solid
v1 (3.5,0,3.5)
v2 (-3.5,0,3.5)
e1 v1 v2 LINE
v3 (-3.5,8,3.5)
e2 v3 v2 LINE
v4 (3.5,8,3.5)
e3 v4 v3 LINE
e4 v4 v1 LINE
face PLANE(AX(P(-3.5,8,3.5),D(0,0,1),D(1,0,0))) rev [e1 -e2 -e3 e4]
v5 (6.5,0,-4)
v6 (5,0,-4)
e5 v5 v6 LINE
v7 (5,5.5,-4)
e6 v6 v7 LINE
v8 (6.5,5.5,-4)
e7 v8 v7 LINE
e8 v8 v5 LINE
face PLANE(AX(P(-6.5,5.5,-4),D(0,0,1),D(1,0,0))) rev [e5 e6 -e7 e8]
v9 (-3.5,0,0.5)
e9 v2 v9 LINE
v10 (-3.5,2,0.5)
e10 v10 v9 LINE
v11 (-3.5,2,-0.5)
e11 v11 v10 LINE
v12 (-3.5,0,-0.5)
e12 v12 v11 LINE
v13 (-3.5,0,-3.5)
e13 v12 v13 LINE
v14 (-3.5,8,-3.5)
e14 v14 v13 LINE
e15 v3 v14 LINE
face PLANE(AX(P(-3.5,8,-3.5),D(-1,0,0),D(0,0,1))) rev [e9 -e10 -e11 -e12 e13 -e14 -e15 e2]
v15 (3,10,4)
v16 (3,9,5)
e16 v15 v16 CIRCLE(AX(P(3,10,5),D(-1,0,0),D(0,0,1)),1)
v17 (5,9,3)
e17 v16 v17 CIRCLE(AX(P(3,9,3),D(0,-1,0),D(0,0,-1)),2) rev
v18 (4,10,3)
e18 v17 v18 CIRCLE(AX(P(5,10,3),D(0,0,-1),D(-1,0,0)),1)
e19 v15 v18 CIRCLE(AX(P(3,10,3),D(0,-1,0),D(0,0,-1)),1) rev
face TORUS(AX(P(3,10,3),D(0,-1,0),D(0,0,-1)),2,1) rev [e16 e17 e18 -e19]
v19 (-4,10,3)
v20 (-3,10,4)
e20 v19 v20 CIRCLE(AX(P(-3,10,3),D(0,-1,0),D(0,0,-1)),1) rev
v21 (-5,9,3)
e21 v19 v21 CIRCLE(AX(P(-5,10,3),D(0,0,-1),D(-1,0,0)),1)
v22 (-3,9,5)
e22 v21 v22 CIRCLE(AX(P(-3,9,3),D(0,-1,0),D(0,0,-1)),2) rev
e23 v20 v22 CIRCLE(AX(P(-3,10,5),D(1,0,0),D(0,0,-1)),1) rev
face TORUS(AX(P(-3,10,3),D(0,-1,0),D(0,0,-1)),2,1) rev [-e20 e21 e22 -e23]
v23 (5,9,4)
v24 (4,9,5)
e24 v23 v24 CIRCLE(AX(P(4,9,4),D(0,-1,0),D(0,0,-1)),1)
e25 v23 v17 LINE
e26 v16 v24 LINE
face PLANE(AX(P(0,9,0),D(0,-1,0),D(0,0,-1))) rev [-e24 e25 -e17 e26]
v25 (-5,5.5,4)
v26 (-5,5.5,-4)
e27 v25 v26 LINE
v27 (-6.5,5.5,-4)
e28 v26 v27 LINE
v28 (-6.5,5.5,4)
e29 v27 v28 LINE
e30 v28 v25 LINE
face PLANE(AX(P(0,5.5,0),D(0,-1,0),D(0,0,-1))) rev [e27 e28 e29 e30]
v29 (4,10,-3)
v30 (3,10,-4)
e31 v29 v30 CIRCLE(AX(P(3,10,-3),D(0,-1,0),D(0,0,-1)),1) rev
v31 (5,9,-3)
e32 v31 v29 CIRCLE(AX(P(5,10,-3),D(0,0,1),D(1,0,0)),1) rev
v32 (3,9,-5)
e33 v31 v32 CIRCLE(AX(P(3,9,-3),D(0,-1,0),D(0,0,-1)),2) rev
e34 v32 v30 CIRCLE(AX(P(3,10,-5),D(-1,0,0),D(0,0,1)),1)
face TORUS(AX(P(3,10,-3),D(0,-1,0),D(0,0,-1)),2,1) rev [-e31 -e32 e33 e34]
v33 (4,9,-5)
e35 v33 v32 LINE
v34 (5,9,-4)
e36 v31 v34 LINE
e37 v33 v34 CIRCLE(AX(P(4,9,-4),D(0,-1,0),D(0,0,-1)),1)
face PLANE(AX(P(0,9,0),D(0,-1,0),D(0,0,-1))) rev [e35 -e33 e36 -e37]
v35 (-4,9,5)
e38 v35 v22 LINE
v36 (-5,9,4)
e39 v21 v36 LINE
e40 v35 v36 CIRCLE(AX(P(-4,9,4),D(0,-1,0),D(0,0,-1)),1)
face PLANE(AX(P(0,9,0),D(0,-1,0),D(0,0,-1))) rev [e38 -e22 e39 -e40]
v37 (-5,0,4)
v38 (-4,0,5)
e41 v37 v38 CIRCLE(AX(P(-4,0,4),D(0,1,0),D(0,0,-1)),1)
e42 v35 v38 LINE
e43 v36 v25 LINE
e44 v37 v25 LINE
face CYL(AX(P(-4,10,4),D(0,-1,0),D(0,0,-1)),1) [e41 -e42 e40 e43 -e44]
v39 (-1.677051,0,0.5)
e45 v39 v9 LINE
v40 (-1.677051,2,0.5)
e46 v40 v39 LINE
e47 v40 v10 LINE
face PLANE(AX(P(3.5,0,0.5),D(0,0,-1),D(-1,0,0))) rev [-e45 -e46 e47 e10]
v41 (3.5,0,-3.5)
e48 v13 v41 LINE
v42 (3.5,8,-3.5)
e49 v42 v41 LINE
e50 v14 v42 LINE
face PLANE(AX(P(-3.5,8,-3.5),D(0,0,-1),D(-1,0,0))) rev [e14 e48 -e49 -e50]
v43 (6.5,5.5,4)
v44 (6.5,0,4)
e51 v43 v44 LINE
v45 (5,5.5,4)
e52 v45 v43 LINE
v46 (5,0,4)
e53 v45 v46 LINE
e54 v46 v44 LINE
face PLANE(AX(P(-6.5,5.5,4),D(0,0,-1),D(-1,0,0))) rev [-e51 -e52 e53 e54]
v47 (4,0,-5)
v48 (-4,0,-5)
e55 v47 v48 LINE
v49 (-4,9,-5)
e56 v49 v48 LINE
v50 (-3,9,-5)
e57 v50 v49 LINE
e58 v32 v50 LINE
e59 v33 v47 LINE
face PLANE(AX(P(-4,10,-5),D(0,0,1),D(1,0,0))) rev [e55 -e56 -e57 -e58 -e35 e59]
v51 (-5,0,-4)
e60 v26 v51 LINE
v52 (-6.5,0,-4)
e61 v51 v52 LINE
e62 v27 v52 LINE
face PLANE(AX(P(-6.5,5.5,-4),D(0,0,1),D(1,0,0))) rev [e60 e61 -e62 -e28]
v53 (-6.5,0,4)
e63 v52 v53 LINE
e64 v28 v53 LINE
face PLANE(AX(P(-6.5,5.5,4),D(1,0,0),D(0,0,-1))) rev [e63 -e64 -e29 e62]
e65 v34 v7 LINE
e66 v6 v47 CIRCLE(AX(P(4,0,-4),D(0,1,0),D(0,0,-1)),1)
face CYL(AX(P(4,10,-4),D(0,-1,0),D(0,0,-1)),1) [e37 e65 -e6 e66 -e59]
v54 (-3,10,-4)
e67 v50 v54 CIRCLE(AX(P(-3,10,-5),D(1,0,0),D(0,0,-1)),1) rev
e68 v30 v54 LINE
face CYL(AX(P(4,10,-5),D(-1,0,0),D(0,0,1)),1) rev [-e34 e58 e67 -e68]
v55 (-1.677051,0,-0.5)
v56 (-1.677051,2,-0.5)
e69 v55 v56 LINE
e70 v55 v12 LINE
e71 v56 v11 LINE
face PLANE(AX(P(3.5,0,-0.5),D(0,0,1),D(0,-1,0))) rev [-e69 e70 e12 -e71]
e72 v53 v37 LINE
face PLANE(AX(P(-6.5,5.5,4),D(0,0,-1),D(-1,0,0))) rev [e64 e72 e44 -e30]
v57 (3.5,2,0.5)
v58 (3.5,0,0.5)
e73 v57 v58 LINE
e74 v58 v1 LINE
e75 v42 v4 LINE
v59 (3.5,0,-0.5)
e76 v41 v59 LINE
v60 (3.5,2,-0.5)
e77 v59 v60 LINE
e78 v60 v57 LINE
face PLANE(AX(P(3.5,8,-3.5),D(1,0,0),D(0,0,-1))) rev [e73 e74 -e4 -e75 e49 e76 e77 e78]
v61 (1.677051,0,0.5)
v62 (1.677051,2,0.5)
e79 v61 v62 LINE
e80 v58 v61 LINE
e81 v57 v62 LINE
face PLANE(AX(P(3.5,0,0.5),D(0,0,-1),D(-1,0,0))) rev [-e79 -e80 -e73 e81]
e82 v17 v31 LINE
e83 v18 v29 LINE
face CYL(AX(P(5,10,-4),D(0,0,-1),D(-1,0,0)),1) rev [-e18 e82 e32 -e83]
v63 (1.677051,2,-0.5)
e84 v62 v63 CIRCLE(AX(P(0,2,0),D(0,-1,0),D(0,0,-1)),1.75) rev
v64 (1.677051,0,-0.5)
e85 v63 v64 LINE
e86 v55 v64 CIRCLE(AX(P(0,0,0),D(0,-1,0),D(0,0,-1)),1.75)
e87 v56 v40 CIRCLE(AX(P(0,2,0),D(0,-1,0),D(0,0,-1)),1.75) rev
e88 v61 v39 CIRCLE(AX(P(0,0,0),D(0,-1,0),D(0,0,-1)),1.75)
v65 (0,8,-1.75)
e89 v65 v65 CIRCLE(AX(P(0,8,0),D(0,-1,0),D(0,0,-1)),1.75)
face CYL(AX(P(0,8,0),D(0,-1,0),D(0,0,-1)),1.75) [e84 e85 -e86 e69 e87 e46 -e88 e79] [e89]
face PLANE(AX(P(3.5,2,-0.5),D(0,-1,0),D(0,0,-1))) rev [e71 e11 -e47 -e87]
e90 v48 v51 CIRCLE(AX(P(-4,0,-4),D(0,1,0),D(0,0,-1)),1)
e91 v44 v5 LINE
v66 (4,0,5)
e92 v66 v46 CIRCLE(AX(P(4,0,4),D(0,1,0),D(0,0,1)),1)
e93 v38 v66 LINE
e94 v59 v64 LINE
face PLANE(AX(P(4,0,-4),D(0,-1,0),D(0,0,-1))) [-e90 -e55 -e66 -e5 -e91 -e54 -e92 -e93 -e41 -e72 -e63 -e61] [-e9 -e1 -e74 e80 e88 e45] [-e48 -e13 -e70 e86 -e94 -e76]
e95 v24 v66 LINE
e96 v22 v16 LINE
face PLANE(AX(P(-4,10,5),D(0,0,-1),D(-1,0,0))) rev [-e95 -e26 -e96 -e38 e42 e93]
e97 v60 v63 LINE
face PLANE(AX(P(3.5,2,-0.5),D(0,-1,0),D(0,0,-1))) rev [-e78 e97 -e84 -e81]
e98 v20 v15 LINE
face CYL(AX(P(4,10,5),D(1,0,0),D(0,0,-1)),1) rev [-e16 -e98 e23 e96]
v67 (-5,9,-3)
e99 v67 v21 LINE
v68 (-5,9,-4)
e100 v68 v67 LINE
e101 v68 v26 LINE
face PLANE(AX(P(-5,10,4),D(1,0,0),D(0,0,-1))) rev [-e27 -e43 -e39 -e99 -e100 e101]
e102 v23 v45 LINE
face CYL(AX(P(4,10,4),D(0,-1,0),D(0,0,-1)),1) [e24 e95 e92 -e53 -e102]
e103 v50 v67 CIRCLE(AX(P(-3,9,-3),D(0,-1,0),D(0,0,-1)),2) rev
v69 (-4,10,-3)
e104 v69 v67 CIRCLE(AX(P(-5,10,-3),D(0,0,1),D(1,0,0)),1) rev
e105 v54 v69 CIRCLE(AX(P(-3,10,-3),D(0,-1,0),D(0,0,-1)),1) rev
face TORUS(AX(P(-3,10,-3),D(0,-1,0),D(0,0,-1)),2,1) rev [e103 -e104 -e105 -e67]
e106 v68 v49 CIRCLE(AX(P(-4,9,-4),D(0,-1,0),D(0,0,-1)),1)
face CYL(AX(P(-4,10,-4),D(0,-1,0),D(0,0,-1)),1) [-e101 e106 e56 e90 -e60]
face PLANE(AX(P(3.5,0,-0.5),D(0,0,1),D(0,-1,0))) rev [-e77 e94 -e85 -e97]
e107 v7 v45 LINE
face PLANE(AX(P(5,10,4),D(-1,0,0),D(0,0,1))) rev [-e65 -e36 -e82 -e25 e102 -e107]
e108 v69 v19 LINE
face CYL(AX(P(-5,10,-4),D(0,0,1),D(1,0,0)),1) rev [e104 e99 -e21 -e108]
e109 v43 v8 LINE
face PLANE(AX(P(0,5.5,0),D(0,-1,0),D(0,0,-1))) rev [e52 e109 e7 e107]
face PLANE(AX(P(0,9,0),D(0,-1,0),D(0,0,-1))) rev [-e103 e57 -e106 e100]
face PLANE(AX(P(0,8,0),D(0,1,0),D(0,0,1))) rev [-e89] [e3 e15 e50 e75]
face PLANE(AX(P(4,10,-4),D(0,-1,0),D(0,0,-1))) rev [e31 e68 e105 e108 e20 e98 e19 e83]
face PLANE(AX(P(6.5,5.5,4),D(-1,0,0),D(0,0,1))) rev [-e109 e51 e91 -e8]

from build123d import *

# Parameters (mm, degrees)
BOSS_EXTRUDE1_DEPTH = 10
SKETCH2_W           = 13
SKETCH2_H           = 8
BOSS_EXTRUDE2_DEPTH = 5.5
SKETCH3_W           = 7
SKETCH3_H           = 7
SKETCH3_R           = 1.75
CUT_EXTRUDE1_DEPTH  = 8
SKETCH4_W           = 1
SKETCH4_H           = 2
BOSS_EXTRUDE3_DEPTH = 7
SKETCH5_W           = 10
SKETCH5_H           = 10
SKETCH5_W_2         = 8
SKETCH5_H_2         = 8
CUT_EXTRUDE2_DEPTH  = 1
FILLET1_R           = 1


with BuildPart() as part:
    # Sketch1 → Boss-Extrude1 (new body)
    with BuildSketch(Plane(origin=(0, 0, 0), x_dir=(1, 0, 0), z_dir=(0, 1, 0))):
        with BuildLine():
            Line((-4, -5), (4, -5))
            ThreePointArc((4, -5), (4.707106781, -4.707106781), (5, -4))
            Line((5, -4), (5, 4))
            ThreePointArc((5, 4), (4.707106781, 4.707106781), (4, 5))
            Line((4, 5), (-4, 5))
            ThreePointArc((-4, 5), (-4.707106781, 4.707106781), (-5, 4))
            Line((-5, 4), (-5, -4))
            ThreePointArc((-5, -4), (-4.707106781, -4.707106781), (-4, -5))
        make_face()
    extrude(amount=BOSS_EXTRUDE1_DEPTH)

    # Sketch2 → Boss-Extrude2 (add)
    with BuildSketch(Plane(origin=(0, 0, 0), x_dir=(1, 0, 0), z_dir=(0, 1, 0))):
        Rectangle(SKETCH2_W, SKETCH2_H)
    extrude(amount=BOSS_EXTRUDE2_DEPTH)

    # Sketch3 → Cut-Extrude1 (cut)
    with BuildSketch(Plane.XZ):
        Rectangle(SKETCH3_W, SKETCH3_H)
        with Locations(Location((0, 0, 0), (0, 0, 270))):
            Circle(SKETCH3_R, mode=Mode.SUBTRACT)
    extrude(amount=-CUT_EXTRUDE1_DEPTH, mode=Mode.SUBTRACT)

    # Sketch4 → Boss-Extrude3 (add)
    with BuildSketch(Plane(origin=(-3.5, 0, 0), x_dir=(0, 0, -1), z_dir=(1, 0, 0))):
        with Locations((0, 1)):
            Rectangle(SKETCH4_W, SKETCH4_H)
    extrude(amount=BOSS_EXTRUDE3_DEPTH)

    # Sketch5 → Cut-Extrude2 (cut)
    with BuildSketch(Plane(origin=(0, 10, 0), x_dir=(1, 0, 0), z_dir=(0, 1, 0))):
        Rectangle(SKETCH5_W, SKETCH5_H)
        Rectangle(SKETCH5_W_2, SKETCH5_H_2, mode=Mode.SUBTRACT)
    extrude(amount=-CUT_EXTRUDE2_DEPTH, mode=Mode.SUBTRACT)

    # Fillet1
    fillet1_edges = [part.edges().sort_by_distance(p)[0] for p in [
        (-4, 9, 0),
        (0, 9, 4),
        (4, 9, 0),
        (0, 9, -4),
        (-4, 9.5, -4),
        (4, 9.5, -4),
        (4, 9.5, 4),
        (-4, 9.5, 4),
    ]]
    fillet(fillet1_edges, radius=FILLET1_R - 0.0001)  # a hair under: the kernel refuses the full size


solid = part.part
